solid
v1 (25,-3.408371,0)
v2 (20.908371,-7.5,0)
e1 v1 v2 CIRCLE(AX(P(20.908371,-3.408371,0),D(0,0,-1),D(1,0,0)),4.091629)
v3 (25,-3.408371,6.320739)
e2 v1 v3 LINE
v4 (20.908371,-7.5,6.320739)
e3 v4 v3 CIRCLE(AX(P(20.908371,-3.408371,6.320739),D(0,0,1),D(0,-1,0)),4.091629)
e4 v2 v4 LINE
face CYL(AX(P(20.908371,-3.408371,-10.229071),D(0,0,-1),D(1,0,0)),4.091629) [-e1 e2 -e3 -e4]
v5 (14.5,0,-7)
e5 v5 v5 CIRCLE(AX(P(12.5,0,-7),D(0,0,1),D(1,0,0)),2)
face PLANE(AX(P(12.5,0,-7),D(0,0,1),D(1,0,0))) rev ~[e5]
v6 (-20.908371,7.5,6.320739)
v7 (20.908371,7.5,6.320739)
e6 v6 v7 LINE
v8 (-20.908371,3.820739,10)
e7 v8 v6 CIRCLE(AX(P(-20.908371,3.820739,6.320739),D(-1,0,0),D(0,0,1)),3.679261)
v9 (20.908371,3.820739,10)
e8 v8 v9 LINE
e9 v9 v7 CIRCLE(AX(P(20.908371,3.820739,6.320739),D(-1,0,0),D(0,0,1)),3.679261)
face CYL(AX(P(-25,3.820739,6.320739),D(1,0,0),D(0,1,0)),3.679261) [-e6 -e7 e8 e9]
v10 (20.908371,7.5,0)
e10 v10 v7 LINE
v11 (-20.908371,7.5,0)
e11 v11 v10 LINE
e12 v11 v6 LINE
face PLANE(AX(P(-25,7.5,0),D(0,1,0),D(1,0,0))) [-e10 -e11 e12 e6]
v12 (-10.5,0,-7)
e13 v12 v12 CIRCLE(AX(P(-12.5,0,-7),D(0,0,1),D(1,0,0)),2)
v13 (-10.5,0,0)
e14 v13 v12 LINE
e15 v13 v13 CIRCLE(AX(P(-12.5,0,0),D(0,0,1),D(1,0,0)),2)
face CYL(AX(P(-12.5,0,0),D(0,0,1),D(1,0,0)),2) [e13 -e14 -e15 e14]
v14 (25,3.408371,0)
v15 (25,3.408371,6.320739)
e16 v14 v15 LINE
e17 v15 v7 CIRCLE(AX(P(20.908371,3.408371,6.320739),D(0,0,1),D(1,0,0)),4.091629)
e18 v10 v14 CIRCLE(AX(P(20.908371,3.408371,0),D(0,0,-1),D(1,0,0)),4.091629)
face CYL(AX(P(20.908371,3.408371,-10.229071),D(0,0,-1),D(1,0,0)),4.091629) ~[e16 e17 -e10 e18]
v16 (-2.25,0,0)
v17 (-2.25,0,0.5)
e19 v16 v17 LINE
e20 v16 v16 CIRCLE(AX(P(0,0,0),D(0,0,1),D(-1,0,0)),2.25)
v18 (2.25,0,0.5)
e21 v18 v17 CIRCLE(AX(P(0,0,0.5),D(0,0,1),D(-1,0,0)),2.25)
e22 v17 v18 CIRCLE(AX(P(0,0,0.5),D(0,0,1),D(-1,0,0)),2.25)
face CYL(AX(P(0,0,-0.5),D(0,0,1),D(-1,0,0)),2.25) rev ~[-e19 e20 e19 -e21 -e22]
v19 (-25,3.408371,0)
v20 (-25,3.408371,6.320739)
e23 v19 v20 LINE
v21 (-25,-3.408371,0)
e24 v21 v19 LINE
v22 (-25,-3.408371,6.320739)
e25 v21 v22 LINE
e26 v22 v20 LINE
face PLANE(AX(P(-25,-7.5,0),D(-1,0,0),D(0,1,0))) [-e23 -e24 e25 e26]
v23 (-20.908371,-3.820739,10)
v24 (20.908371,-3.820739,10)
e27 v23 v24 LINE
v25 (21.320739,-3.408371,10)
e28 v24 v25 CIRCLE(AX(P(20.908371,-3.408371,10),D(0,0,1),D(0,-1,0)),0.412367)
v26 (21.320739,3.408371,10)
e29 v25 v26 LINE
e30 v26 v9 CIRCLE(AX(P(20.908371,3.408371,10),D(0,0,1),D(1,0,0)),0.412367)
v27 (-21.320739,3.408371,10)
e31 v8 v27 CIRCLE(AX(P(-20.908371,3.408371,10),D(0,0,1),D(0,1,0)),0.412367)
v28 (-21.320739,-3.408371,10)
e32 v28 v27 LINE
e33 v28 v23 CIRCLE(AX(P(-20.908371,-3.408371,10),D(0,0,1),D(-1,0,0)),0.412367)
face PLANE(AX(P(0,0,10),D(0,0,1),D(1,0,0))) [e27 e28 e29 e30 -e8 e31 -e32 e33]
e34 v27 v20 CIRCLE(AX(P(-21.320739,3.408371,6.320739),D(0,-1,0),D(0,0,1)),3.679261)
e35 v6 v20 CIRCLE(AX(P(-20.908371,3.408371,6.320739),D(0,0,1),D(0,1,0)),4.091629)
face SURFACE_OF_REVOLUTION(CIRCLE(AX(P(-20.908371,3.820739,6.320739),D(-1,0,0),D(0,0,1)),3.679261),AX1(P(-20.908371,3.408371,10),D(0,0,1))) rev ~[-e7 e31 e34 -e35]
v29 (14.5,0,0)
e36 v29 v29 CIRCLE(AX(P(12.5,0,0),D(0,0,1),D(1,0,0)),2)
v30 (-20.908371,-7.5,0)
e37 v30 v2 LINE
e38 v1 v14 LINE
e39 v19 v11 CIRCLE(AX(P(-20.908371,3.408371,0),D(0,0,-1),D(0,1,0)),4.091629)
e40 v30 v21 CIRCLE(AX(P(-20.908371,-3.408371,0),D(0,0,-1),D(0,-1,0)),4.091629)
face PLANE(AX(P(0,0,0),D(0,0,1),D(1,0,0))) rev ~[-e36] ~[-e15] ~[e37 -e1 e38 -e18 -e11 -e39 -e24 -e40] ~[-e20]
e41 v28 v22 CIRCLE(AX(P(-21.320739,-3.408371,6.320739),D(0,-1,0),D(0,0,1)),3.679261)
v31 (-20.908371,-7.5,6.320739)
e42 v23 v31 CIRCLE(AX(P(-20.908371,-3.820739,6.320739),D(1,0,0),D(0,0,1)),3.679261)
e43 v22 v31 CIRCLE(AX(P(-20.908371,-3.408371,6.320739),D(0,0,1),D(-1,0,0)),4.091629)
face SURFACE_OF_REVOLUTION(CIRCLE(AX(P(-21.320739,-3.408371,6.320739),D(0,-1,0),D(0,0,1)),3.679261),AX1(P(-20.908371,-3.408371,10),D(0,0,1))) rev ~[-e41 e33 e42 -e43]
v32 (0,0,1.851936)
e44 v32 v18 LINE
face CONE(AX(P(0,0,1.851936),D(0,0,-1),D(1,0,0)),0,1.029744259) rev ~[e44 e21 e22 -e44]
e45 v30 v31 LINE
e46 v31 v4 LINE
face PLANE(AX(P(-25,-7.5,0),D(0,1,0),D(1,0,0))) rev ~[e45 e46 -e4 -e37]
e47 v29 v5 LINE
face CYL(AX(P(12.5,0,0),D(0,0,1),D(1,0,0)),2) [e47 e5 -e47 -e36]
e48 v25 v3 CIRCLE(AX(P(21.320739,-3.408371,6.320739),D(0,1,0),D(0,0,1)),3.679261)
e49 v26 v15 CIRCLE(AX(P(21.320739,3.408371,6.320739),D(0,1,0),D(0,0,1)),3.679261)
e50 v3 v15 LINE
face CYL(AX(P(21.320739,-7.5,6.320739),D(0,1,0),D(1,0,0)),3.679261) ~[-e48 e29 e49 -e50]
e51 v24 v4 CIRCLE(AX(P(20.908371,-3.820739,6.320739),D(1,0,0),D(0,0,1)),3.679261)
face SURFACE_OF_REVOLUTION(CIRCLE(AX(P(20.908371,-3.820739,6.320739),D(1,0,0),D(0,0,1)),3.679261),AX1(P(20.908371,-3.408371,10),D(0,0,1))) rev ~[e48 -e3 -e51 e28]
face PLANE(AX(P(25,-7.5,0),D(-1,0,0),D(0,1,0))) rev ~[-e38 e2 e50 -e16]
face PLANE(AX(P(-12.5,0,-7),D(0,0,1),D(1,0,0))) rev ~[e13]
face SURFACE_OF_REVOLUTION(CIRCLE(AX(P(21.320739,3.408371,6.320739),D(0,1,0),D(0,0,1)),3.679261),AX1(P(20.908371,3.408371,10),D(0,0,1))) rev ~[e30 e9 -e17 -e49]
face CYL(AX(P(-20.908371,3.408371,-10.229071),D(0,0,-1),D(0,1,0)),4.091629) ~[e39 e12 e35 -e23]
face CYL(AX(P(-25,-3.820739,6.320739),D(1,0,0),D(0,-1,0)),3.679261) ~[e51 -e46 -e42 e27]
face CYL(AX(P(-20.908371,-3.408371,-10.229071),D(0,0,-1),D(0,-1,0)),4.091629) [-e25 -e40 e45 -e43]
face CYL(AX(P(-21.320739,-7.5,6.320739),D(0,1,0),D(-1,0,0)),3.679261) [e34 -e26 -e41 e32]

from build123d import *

# Parameters (mm, degrees)
F0_W         = 50
F0_H         = 15
F0_R         = 2
F1_DEPTH     = 10
F2_R         = 3.6792614691
F3_T1_DEPTH  = 20.2290713461
F3_T4_ANGLE  = 90
F3_T6_ANGLE  = 90
F3_T8_ANGLE  = 90
F3_T10_ANGLE = 90
F4_D         = 4.5
F4_DEPTH     = 0.5
F4_TIP       = 1.3519363928
F5_DEPTH     = 7


# Not quite as in the source:
# - a fillet or chamfer that OpenCascade refuses, or shapes differently, is made with other operations: its cross-section is extruded or revolved along the edge and cut away or added


with BuildPart() as f1:
    # F0 (on Top) → F1 (new body)
    with BuildSketch(Plane.XY):
        Rectangle(F0_W, F0_H)
        with Locations((-12.5, 0)):
            Circle(F0_R, mode=Mode.SUBTRACT)
        with Locations((12.5, 0)):
            Circle(F0_R, mode=Mode.SUBTRACT)
        with Locations((12.5, 0)):
            Circle(F0_R)
        with Locations((-12.5, 0)):
            Circle(F0_R)
    extrude(amount=F1_DEPTH)

    # F2
    f2_edges = [f1.edges().sort_by_distance(p)[0] for p in [
        (0, -7.5, 10),
        (-25, 0, 10),
        (25, 0, 10),
        (0, 7.5, 10),
    ]]
    fillet(f2_edges, radius=F2_R)

    # F3: fillet of radius 4.0916285384 on 4 edges, made by hand

    # F3_s2 → F3_t1 (cut)
    with BuildSketch(Plane.XY.offset(-10.2290713461)):
        with BuildLine():
            ThreePointArc((-20.9083714616, 7.5), (-23.8015897472, 6.3015897472), (-25, 3.4083714616))
            Line((-25, 3.4083714616), (-25, 7.5))
            Line((-25, 7.5), (-20.9083714616, 7.5))
        make_face()
        with BuildLine():
            ThreePointArc((-20.9083714616, -7.5), (-23.8015897472, -6.3015897472), (-25, -3.4083714616))
            Line((-25, -3.4083714616), (-25, -7.5))
            Line((-25, -7.5), (-20.9083714616, -7.5))
        make_face()
        with BuildLine():
            ThreePointArc((25, 3.4083714616), (23.8015897472, 6.3015897472), (20.9083714616, 7.5))
            Line((20.9083714616, 7.5), (25, 7.5))
            Line((25, 7.5), (25, 3.4083714616))
        make_face()
        with BuildLine():
            ThreePointArc((25, -3.4083714616), (23.8015897472, -6.3015897472), (20.9083714616, -7.5))
            Line((20.9083714616, -7.5), (25, -7.5))
            Line((25, -7.5), (25, -3.4083714616))
        make_face()
    extrude(amount=F3_T1_DEPTH, mode=Mode.SUBTRACT)

    # F3_s3 → F3_t4 (revolve, cut)
    with BuildSketch(Plane.YZ.offset(20.9083714616)):
        with BuildLine():
            ThreePointArc((-3.8207385309, 10), (-6.4223692655, 8.9223692655), (-7.5, 6.3207385309))
            Line((-7.5, 6.3207385309), (-7.5, 10))
            Line((-7.5, 10), (-3.8207385309, 10))
        make_face()
    revolve(axis=Axis((20.9083714616, -3.4083714616, 10), (0, 0, 1)), revolution_arc=F3_T4_ANGLE, mode=Mode.SUBTRACT)

    # F3_s5 → F3_t6 (revolve, cut)
    with BuildSketch(Plane.XZ.offset(-3.4083714616)):
        with BuildLine():
            ThreePointArc((21.3207385309, 10), (23.9223692655, 8.9223692655), (25, 6.3207385309))
            Line((25, 6.3207385309), (25, 10))
            Line((25, 10), (21.3207385309, 10))
        make_face()
    revolve(axis=Axis((20.9083714616, 3.4083714616, 10), (0, 0, 1)), revolution_arc=F3_T6_ANGLE, mode=Mode.SUBTRACT)

    # F3_s7 → F3_t8 (revolve, cut)
    with BuildSketch(Plane.XZ.offset(3.4083714616)):
        with BuildLine():
            ThreePointArc((-21.3207385309, 10), (-23.9223692655, 8.9223692655), (-25, 6.3207385309))
            Line((-25, 6.3207385309), (-25, 10))
            Line((-25, 10), (-21.3207385309, 10))
        make_face()
    revolve(axis=Axis((-20.9083714616, -3.4083714616, 10), (0, 0, 1)), revolution_arc=F3_T8_ANGLE, mode=Mode.SUBTRACT)

    # F3_s9 → F3_t10 (revolve, cut)
    with BuildSketch(Plane.YZ.offset(-20.9083714616)):
        with BuildLine():
            ThreePointArc((3.8207385309, 10), (6.4223692655, 8.9223692655), (7.5, 6.3207385309))
            Line((7.5, 6.3207385309), (7.5, 10))
            Line((7.5, 10), (3.8207385309, 10))
        make_face()
    revolve(axis=Axis((-20.9083714616, 3.4083714616, 10), (0, 0, 1)), revolution_arc=F3_T10_ANGLE, mode=Mode.SUBTRACT)

    # F4
    with Locations(Plane(origin=(0, 0, 0), x_dir=(1, 0, 0), z_dir=(0, 0, -1))):
        with Locations((0, 0)):
            Hole(F4_D / 2, depth=F4_DEPTH)
            with Locations((0, 0, -(F4_DEPTH + F4_TIP / 2))):  # 118° drill point
                Cone(0, F4_D / 2, F4_TIP, mode=Mode.SUBTRACT)

    # F0 (on Top) → F5 (join)
    with BuildSketch(Plane.XY):
        with Locations((12.5, 0)):
            Circle(F0_R)
        with Locations((-12.5, 0)):
            Circle(F0_R)
    extrude(amount=-F5_DEPTH)


solid = f1.part
